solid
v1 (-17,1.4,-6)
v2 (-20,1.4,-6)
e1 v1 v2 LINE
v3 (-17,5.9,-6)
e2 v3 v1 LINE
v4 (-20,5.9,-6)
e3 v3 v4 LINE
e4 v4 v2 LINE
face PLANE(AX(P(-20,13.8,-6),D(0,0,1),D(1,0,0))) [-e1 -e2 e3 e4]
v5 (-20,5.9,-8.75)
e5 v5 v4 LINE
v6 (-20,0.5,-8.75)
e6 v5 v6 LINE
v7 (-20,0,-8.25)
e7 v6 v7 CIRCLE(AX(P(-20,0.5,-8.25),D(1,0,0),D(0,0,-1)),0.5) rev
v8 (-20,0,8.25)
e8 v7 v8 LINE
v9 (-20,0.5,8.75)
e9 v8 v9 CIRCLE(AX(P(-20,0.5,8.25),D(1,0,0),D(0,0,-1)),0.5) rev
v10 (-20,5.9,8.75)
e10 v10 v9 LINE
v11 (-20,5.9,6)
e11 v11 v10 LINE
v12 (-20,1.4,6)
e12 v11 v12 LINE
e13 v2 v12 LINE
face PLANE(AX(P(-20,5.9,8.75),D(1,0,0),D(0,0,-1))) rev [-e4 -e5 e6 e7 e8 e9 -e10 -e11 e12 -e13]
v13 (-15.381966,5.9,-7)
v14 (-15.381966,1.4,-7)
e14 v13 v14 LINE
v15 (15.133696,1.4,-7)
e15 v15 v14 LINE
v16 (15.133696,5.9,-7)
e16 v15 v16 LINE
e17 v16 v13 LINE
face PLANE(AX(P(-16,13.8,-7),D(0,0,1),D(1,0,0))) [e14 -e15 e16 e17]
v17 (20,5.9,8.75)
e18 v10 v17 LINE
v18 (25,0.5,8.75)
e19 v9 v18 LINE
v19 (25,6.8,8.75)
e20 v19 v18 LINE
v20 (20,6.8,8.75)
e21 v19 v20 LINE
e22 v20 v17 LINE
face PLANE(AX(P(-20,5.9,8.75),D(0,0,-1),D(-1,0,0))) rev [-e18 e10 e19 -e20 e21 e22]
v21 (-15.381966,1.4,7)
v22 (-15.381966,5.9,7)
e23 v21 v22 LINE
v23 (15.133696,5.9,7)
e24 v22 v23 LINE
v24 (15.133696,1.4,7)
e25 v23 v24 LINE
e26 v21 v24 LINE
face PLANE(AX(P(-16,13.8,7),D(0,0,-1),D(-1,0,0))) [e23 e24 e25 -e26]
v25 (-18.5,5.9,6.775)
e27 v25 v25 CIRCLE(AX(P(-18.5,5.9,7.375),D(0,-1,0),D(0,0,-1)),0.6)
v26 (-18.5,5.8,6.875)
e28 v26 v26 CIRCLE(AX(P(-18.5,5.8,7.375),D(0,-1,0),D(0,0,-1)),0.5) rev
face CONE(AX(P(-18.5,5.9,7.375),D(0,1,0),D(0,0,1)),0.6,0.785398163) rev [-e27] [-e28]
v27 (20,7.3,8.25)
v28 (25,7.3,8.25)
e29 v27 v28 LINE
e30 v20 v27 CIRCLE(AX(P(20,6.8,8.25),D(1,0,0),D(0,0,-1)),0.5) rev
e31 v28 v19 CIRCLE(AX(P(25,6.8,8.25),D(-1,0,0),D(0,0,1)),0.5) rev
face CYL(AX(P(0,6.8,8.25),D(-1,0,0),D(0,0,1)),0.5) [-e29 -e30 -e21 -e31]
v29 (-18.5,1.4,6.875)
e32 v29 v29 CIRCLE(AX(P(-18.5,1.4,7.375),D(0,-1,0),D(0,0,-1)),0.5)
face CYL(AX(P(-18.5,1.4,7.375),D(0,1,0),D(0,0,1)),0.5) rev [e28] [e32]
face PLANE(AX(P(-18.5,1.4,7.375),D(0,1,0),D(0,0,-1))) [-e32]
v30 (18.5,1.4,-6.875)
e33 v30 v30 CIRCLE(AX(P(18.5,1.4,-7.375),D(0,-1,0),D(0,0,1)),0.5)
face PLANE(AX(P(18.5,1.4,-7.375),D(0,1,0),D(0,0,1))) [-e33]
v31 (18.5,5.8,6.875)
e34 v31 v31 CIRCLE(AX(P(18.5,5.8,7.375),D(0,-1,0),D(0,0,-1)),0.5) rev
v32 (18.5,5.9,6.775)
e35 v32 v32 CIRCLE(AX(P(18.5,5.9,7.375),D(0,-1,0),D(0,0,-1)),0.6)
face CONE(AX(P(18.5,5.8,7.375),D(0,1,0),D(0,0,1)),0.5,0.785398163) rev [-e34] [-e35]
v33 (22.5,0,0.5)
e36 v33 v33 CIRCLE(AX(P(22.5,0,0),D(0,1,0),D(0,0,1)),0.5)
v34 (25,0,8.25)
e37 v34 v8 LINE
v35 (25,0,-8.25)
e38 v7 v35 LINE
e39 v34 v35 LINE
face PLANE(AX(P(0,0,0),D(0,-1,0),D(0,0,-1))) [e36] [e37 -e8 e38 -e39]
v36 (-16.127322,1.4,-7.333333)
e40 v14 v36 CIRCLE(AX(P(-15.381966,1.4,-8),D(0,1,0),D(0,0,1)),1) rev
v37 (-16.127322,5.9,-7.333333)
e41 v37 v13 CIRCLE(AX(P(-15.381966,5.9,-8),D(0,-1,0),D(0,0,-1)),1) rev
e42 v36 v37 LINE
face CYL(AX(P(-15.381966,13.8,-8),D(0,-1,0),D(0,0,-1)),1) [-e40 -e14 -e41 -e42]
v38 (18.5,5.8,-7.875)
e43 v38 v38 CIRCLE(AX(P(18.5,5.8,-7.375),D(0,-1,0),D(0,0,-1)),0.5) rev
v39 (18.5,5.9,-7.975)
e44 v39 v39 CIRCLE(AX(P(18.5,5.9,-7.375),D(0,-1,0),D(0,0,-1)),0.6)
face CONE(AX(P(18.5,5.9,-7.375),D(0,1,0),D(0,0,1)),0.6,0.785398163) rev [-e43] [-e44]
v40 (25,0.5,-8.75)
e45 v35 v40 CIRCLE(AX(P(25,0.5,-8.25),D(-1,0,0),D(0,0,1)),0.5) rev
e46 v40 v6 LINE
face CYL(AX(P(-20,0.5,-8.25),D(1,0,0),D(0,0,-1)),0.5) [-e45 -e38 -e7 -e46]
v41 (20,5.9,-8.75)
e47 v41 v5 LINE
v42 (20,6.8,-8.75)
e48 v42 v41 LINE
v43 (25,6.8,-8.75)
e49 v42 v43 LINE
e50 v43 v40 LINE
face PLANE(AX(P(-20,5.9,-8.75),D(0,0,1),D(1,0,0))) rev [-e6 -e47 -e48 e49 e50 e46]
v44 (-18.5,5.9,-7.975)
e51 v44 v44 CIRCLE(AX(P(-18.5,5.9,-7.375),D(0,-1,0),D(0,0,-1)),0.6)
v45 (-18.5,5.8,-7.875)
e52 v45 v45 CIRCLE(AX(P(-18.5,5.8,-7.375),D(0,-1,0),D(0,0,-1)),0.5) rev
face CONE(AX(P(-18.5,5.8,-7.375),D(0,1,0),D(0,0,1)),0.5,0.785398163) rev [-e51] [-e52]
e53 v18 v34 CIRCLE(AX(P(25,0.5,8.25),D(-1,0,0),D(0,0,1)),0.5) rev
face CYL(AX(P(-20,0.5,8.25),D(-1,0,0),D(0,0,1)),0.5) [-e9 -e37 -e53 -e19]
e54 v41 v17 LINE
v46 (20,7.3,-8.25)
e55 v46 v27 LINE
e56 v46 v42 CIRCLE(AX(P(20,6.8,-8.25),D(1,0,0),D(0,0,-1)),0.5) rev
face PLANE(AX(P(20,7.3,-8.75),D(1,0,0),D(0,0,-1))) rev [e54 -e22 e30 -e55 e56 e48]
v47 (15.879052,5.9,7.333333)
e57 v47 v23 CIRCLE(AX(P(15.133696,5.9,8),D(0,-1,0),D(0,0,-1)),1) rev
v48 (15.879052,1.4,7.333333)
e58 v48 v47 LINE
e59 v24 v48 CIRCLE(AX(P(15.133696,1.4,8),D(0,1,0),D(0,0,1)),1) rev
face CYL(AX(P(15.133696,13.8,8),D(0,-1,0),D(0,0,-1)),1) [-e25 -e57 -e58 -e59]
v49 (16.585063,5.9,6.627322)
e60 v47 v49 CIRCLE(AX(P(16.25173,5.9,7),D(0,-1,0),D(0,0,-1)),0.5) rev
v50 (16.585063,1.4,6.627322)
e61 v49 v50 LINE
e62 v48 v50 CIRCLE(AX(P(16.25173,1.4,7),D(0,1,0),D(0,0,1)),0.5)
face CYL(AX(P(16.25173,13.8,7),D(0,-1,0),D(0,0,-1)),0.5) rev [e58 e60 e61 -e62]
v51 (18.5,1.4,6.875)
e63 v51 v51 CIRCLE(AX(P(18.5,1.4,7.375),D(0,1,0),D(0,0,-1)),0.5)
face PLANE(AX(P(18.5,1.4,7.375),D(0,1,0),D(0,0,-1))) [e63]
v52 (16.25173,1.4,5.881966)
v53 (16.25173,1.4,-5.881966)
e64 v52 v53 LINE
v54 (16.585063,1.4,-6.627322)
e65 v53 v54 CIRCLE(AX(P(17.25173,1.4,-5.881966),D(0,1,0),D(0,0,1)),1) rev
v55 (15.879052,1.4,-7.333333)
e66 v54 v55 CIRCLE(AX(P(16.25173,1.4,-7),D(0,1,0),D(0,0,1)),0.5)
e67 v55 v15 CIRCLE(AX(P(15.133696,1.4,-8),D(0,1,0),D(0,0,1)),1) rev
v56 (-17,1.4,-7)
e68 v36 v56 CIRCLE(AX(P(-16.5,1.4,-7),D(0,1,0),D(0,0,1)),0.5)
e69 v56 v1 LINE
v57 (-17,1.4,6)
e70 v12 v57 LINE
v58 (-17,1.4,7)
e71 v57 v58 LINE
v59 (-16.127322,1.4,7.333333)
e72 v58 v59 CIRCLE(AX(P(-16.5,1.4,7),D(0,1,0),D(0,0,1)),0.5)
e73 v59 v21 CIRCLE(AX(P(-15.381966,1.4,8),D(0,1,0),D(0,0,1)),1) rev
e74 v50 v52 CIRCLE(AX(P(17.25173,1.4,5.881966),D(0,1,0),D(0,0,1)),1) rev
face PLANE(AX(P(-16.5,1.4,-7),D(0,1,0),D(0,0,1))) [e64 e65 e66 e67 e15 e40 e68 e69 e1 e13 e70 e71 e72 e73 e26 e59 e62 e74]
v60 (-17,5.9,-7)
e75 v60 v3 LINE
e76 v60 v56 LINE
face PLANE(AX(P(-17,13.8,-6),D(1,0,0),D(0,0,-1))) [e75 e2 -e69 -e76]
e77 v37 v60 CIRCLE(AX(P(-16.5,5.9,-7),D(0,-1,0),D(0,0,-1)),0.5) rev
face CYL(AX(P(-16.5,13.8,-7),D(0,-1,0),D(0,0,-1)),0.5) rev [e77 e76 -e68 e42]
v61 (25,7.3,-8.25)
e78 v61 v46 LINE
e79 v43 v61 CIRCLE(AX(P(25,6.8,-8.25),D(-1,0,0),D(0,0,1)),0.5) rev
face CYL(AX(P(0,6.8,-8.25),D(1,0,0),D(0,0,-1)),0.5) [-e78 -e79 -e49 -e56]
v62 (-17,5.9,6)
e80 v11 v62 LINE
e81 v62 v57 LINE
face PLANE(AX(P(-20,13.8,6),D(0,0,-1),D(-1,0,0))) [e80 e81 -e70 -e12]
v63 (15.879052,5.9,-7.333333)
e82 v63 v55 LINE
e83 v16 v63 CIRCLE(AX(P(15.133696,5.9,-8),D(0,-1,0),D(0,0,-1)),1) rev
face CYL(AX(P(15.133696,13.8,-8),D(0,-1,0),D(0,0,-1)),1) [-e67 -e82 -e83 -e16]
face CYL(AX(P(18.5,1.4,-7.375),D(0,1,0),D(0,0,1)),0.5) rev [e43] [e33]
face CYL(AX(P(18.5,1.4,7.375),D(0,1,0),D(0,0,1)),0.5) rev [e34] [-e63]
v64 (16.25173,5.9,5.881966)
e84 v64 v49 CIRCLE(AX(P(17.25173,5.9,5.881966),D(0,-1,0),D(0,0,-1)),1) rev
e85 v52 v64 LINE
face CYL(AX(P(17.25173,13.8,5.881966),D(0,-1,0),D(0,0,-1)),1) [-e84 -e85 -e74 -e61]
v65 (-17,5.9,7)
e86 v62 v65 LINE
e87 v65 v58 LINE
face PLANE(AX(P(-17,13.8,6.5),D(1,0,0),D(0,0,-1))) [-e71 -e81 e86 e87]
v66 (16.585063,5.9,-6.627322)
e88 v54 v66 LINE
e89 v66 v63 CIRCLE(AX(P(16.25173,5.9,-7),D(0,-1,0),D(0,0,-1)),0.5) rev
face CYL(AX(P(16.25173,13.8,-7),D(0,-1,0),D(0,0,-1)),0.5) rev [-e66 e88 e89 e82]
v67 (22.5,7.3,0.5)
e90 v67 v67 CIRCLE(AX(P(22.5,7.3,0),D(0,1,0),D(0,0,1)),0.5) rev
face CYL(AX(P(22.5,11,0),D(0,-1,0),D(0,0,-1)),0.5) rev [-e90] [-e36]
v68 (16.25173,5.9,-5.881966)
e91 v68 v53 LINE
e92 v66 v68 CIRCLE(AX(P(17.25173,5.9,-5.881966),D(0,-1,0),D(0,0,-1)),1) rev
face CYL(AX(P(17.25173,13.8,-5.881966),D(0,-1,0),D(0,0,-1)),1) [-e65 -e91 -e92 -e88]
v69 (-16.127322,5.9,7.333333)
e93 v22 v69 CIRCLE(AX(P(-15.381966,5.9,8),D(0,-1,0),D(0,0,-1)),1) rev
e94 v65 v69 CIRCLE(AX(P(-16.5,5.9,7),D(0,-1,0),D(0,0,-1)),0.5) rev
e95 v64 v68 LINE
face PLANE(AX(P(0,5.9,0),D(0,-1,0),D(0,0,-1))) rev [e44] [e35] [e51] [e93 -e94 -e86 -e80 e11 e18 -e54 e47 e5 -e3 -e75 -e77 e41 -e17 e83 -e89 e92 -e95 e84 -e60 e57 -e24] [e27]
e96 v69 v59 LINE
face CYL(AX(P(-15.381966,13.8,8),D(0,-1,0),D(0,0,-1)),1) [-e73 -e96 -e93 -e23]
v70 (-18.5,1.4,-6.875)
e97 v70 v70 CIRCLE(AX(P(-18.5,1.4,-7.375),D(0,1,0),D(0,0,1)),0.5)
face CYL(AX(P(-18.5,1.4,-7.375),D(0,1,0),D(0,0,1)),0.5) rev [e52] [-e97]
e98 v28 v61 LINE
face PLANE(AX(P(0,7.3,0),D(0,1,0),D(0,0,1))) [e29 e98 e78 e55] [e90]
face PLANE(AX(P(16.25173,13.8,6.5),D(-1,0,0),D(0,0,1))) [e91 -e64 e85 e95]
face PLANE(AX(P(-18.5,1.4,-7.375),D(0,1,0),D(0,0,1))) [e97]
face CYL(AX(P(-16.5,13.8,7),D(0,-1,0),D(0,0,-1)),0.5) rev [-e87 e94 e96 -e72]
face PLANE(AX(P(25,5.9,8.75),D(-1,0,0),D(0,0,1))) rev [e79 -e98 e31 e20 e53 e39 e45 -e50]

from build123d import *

# Parameters (mm, degrees)
SKETCH_1_W                 = 45
SKETCH_1_H                 = 17.5
EXTRUDE_2_DEPTH            = 5.9
CUT_EXTRUDE_1_DEPTH        = 10
CUT_EXTRUDE_1_DEPTH_BACK   = 2.4
FILLET_1_R                 = 1
FILLET_2_R                 = 1
FILLET_5_R                 = 1
FILLET_6_R                 = 1
FILLET_7_R                 = 0.5
SKETCH_5_R                 = 0.5
CUT_EXTRUDE_2_DEPTH        = 4.5
CHAMFER_1_SIZE             = 0.1
CHAMFER_1_OF_MIRROR_1_SIZE = 0.1
SKETCH_20_W                = 5
SKETCH_20_H                = 17.5
EXTRUDE_3_DEPTH            = 1.4
FILLET_8_R                 = 0.5
SKETCH_21_R                = 0.5
CUT_EXTRUDE_3_DEPTH        = 11


# Read off the part's stored shape, not the designer's step: 镜向2
with BuildPart() as part:
    # 草图1 → 凸台-拉伸2 (new body)
    with BuildSketch(Plane(origin=(0, 0, 0), x_dir=(1, 0, 0), z_dir=(0, 1, 0))):
        with Locations((2.5, 0)):
            Rectangle(SKETCH_1_W, SKETCH_1_H)
    extrude(amount=EXTRUDE_2_DEPTH)

    # 草图3 → 切除-拉伸1 (cut, two sides: drawn at the far end of the back side and taken through both)
    with BuildSketch(Plane(origin=(0, 3.8, 0), x_dir=(1, 0, 0), z_dir=(0, 1, 0)).offset(-CUT_EXTRUDE_1_DEPTH_BACK)):
        with BuildLine():
            Line((-17, -6.5), (-17, -7))
            ThreePointArc((-17, -7), (-16.5, -7.5), (-16, -7))
            Line((-16, -7), (15.751729614, -7))
            ThreePointArc((15.751729614, -7), (16.605283005, -7.353553391), (16.251729614, -6.5))
            Line((16.251729614, -6.5), (16.251729614, 6.5))
            ThreePointArc((16.251729614, 6.5), (16.605283005, 7.353553391), (15.751729614, 7))
            Line((15.751729614, 7), (-16, 7))
            ThreePointArc((-16, 7), (-16.5, 7.5), (-17, 7))
            Line((-17, 7), (-17, 6.5))
            Line((-17, 6.5), (-17, 6))
            Line((-17, 6), (-20, 6))
            Line((-20, 6), (-20, -6))
            Line((-20, -6), (-17, -6))
            Line((-17, -6), (-17, -6.5))
        make_face()
    extrude(amount=CUT_EXTRUDE_1_DEPTH + CUT_EXTRUDE_1_DEPTH_BACK, mode=Mode.SUBTRACT)

    # 圆角1
    fillet_1_edges = [part.edges().sort_by_distance(p)[0] for p in [
        (16.251729614, 3.65, -6.5),
    ]]
    fillet(fillet_1_edges, radius=FILLET_1_R)

    # 圆角2
    fillet_2_edges = [part.edges().sort_by_distance(p)[0] for p in [
        (15.751729614, 3.65, -7),
    ]]
    fillet(fillet_2_edges, radius=FILLET_2_R)

    # 圆角5
    fillet_5_edges = [part.edges().sort_by_distance(p)[0] for p in [
        (-16, 3.65, 7),
        (-16, 3.65, -7),
    ]]
    fillet(fillet_5_edges, radius=FILLET_5_R)

    # 圆角6
    fillet_6_edges = [part.edges().sort_by_distance(p)[0] for p in [
        (15.751729614, 3.65, 7),
        (16.251729614, 3.65, 6.5),
    ]]
    fillet(fillet_6_edges, radius=FILLET_6_R)

    # 圆角7
    fillet_7_edges = [part.edges().sort_by_distance(p)[0] for p in [
        (2.5, 0, -8.75),
        (2.5, 0, 8.75),
    ]]
    fillet(fillet_7_edges, radius=FILLET_7_R)

    # 草图5 → 切除-拉伸2 (cut)
    with BuildSketch(Plane(origin=(0, 5.9, 0), x_dir=(1, 0, 0), z_dir=(0, 1, 0))):
        with Locations(Location((-18.5, 7.375, 0), (0, 0, 270))):
            Circle(SKETCH_5_R)
    cut_extrude_2 = extrude(amount=-CUT_EXTRUDE_2_DEPTH, mode=Mode.SUBTRACT)

    # 倒角1
    chamfer_1_edges = [part.edges().sort_by_distance(p)[0] for p in [
        (-18.5, 5.9, -7.875),
    ]]
    chamfer(chamfer_1_edges, length=CHAMFER_1_SIZE)

    # 镜向1: 切除-拉伸2 across plane
    add(cut_extrude_2.mirror(Plane.XY), mode=Mode.SUBTRACT)

    # 倒角1 of 镜向1
    chamfer_1_of_mirror_1_edges = [part.edges().sort_by_distance(p)[0] for p in [
        (-18.5, 5.9, 7.875),
    ]]
    chamfer(chamfer_1_of_mirror_1_edges, length=CHAMFER_1_OF_MIRROR_1_SIZE)

    # 镜向2 outline → 镜向2 (revolve, cut)
    with BuildSketch(Plane(origin=(18.5, 0, -7.375), x_dir=(1, 0, 0), z_dir=(0, 0, 1))):
        Polygon((0, 5.9), (0, 1.4), (0.5, 1.4), (0.5, 5.8), (0.6, 5.9), align=None)
    revolve(axis=Axis((18.5, 0, -7.375), (0, 1, 0)), mode=Mode.SUBTRACT)

    # Mirror 2 2 outline → Mirror 2 2 (revolve, cut)
    with BuildSketch(Plane(origin=(18.5, 0, 7.375), x_dir=(1, 0, 0), z_dir=(0, 0, 1))):
        Polygon((0, 5.9), (0, 1.4), (0.5, 1.4), (0.5, 5.8), (0.6, 5.9), align=None)
    revolve(axis=Axis((18.5, 0, 7.375), (0, 1, 0)), mode=Mode.SUBTRACT)

    # 草图20 → 凸台-拉伸3 (add)
    with BuildSketch(Plane(origin=(0, 5.9, 0), x_dir=(1, 0, 0), z_dir=(0, 1, 0))):
        with Locations((22.5, 0)):
            Rectangle(SKETCH_20_W, SKETCH_20_H)
    extrude(amount=EXTRUDE_3_DEPTH)

    # 圆角8
    fillet_8_edges = [part.edges().sort_by_distance(p)[0] for p in [
        (22.5, 7.3, 8.75),
        (22.5, 7.3, -8.75),
    ]]
    fillet(fillet_8_edges, radius=FILLET_8_R)

    # 草图21 → 切除-拉伸3 (cut)
    with BuildSketch(Plane(origin=(0, 0, 0), x_dir=(1, 0, 0), z_dir=(0, 1, 0))):
        with Locations(Location((22.5, 0, 0), (0, 0, 270))):
            Circle(SKETCH_21_R)
    extrude(amount=CUT_EXTRUDE_3_DEPTH, mode=Mode.SUBTRACT)


solid = part.part
